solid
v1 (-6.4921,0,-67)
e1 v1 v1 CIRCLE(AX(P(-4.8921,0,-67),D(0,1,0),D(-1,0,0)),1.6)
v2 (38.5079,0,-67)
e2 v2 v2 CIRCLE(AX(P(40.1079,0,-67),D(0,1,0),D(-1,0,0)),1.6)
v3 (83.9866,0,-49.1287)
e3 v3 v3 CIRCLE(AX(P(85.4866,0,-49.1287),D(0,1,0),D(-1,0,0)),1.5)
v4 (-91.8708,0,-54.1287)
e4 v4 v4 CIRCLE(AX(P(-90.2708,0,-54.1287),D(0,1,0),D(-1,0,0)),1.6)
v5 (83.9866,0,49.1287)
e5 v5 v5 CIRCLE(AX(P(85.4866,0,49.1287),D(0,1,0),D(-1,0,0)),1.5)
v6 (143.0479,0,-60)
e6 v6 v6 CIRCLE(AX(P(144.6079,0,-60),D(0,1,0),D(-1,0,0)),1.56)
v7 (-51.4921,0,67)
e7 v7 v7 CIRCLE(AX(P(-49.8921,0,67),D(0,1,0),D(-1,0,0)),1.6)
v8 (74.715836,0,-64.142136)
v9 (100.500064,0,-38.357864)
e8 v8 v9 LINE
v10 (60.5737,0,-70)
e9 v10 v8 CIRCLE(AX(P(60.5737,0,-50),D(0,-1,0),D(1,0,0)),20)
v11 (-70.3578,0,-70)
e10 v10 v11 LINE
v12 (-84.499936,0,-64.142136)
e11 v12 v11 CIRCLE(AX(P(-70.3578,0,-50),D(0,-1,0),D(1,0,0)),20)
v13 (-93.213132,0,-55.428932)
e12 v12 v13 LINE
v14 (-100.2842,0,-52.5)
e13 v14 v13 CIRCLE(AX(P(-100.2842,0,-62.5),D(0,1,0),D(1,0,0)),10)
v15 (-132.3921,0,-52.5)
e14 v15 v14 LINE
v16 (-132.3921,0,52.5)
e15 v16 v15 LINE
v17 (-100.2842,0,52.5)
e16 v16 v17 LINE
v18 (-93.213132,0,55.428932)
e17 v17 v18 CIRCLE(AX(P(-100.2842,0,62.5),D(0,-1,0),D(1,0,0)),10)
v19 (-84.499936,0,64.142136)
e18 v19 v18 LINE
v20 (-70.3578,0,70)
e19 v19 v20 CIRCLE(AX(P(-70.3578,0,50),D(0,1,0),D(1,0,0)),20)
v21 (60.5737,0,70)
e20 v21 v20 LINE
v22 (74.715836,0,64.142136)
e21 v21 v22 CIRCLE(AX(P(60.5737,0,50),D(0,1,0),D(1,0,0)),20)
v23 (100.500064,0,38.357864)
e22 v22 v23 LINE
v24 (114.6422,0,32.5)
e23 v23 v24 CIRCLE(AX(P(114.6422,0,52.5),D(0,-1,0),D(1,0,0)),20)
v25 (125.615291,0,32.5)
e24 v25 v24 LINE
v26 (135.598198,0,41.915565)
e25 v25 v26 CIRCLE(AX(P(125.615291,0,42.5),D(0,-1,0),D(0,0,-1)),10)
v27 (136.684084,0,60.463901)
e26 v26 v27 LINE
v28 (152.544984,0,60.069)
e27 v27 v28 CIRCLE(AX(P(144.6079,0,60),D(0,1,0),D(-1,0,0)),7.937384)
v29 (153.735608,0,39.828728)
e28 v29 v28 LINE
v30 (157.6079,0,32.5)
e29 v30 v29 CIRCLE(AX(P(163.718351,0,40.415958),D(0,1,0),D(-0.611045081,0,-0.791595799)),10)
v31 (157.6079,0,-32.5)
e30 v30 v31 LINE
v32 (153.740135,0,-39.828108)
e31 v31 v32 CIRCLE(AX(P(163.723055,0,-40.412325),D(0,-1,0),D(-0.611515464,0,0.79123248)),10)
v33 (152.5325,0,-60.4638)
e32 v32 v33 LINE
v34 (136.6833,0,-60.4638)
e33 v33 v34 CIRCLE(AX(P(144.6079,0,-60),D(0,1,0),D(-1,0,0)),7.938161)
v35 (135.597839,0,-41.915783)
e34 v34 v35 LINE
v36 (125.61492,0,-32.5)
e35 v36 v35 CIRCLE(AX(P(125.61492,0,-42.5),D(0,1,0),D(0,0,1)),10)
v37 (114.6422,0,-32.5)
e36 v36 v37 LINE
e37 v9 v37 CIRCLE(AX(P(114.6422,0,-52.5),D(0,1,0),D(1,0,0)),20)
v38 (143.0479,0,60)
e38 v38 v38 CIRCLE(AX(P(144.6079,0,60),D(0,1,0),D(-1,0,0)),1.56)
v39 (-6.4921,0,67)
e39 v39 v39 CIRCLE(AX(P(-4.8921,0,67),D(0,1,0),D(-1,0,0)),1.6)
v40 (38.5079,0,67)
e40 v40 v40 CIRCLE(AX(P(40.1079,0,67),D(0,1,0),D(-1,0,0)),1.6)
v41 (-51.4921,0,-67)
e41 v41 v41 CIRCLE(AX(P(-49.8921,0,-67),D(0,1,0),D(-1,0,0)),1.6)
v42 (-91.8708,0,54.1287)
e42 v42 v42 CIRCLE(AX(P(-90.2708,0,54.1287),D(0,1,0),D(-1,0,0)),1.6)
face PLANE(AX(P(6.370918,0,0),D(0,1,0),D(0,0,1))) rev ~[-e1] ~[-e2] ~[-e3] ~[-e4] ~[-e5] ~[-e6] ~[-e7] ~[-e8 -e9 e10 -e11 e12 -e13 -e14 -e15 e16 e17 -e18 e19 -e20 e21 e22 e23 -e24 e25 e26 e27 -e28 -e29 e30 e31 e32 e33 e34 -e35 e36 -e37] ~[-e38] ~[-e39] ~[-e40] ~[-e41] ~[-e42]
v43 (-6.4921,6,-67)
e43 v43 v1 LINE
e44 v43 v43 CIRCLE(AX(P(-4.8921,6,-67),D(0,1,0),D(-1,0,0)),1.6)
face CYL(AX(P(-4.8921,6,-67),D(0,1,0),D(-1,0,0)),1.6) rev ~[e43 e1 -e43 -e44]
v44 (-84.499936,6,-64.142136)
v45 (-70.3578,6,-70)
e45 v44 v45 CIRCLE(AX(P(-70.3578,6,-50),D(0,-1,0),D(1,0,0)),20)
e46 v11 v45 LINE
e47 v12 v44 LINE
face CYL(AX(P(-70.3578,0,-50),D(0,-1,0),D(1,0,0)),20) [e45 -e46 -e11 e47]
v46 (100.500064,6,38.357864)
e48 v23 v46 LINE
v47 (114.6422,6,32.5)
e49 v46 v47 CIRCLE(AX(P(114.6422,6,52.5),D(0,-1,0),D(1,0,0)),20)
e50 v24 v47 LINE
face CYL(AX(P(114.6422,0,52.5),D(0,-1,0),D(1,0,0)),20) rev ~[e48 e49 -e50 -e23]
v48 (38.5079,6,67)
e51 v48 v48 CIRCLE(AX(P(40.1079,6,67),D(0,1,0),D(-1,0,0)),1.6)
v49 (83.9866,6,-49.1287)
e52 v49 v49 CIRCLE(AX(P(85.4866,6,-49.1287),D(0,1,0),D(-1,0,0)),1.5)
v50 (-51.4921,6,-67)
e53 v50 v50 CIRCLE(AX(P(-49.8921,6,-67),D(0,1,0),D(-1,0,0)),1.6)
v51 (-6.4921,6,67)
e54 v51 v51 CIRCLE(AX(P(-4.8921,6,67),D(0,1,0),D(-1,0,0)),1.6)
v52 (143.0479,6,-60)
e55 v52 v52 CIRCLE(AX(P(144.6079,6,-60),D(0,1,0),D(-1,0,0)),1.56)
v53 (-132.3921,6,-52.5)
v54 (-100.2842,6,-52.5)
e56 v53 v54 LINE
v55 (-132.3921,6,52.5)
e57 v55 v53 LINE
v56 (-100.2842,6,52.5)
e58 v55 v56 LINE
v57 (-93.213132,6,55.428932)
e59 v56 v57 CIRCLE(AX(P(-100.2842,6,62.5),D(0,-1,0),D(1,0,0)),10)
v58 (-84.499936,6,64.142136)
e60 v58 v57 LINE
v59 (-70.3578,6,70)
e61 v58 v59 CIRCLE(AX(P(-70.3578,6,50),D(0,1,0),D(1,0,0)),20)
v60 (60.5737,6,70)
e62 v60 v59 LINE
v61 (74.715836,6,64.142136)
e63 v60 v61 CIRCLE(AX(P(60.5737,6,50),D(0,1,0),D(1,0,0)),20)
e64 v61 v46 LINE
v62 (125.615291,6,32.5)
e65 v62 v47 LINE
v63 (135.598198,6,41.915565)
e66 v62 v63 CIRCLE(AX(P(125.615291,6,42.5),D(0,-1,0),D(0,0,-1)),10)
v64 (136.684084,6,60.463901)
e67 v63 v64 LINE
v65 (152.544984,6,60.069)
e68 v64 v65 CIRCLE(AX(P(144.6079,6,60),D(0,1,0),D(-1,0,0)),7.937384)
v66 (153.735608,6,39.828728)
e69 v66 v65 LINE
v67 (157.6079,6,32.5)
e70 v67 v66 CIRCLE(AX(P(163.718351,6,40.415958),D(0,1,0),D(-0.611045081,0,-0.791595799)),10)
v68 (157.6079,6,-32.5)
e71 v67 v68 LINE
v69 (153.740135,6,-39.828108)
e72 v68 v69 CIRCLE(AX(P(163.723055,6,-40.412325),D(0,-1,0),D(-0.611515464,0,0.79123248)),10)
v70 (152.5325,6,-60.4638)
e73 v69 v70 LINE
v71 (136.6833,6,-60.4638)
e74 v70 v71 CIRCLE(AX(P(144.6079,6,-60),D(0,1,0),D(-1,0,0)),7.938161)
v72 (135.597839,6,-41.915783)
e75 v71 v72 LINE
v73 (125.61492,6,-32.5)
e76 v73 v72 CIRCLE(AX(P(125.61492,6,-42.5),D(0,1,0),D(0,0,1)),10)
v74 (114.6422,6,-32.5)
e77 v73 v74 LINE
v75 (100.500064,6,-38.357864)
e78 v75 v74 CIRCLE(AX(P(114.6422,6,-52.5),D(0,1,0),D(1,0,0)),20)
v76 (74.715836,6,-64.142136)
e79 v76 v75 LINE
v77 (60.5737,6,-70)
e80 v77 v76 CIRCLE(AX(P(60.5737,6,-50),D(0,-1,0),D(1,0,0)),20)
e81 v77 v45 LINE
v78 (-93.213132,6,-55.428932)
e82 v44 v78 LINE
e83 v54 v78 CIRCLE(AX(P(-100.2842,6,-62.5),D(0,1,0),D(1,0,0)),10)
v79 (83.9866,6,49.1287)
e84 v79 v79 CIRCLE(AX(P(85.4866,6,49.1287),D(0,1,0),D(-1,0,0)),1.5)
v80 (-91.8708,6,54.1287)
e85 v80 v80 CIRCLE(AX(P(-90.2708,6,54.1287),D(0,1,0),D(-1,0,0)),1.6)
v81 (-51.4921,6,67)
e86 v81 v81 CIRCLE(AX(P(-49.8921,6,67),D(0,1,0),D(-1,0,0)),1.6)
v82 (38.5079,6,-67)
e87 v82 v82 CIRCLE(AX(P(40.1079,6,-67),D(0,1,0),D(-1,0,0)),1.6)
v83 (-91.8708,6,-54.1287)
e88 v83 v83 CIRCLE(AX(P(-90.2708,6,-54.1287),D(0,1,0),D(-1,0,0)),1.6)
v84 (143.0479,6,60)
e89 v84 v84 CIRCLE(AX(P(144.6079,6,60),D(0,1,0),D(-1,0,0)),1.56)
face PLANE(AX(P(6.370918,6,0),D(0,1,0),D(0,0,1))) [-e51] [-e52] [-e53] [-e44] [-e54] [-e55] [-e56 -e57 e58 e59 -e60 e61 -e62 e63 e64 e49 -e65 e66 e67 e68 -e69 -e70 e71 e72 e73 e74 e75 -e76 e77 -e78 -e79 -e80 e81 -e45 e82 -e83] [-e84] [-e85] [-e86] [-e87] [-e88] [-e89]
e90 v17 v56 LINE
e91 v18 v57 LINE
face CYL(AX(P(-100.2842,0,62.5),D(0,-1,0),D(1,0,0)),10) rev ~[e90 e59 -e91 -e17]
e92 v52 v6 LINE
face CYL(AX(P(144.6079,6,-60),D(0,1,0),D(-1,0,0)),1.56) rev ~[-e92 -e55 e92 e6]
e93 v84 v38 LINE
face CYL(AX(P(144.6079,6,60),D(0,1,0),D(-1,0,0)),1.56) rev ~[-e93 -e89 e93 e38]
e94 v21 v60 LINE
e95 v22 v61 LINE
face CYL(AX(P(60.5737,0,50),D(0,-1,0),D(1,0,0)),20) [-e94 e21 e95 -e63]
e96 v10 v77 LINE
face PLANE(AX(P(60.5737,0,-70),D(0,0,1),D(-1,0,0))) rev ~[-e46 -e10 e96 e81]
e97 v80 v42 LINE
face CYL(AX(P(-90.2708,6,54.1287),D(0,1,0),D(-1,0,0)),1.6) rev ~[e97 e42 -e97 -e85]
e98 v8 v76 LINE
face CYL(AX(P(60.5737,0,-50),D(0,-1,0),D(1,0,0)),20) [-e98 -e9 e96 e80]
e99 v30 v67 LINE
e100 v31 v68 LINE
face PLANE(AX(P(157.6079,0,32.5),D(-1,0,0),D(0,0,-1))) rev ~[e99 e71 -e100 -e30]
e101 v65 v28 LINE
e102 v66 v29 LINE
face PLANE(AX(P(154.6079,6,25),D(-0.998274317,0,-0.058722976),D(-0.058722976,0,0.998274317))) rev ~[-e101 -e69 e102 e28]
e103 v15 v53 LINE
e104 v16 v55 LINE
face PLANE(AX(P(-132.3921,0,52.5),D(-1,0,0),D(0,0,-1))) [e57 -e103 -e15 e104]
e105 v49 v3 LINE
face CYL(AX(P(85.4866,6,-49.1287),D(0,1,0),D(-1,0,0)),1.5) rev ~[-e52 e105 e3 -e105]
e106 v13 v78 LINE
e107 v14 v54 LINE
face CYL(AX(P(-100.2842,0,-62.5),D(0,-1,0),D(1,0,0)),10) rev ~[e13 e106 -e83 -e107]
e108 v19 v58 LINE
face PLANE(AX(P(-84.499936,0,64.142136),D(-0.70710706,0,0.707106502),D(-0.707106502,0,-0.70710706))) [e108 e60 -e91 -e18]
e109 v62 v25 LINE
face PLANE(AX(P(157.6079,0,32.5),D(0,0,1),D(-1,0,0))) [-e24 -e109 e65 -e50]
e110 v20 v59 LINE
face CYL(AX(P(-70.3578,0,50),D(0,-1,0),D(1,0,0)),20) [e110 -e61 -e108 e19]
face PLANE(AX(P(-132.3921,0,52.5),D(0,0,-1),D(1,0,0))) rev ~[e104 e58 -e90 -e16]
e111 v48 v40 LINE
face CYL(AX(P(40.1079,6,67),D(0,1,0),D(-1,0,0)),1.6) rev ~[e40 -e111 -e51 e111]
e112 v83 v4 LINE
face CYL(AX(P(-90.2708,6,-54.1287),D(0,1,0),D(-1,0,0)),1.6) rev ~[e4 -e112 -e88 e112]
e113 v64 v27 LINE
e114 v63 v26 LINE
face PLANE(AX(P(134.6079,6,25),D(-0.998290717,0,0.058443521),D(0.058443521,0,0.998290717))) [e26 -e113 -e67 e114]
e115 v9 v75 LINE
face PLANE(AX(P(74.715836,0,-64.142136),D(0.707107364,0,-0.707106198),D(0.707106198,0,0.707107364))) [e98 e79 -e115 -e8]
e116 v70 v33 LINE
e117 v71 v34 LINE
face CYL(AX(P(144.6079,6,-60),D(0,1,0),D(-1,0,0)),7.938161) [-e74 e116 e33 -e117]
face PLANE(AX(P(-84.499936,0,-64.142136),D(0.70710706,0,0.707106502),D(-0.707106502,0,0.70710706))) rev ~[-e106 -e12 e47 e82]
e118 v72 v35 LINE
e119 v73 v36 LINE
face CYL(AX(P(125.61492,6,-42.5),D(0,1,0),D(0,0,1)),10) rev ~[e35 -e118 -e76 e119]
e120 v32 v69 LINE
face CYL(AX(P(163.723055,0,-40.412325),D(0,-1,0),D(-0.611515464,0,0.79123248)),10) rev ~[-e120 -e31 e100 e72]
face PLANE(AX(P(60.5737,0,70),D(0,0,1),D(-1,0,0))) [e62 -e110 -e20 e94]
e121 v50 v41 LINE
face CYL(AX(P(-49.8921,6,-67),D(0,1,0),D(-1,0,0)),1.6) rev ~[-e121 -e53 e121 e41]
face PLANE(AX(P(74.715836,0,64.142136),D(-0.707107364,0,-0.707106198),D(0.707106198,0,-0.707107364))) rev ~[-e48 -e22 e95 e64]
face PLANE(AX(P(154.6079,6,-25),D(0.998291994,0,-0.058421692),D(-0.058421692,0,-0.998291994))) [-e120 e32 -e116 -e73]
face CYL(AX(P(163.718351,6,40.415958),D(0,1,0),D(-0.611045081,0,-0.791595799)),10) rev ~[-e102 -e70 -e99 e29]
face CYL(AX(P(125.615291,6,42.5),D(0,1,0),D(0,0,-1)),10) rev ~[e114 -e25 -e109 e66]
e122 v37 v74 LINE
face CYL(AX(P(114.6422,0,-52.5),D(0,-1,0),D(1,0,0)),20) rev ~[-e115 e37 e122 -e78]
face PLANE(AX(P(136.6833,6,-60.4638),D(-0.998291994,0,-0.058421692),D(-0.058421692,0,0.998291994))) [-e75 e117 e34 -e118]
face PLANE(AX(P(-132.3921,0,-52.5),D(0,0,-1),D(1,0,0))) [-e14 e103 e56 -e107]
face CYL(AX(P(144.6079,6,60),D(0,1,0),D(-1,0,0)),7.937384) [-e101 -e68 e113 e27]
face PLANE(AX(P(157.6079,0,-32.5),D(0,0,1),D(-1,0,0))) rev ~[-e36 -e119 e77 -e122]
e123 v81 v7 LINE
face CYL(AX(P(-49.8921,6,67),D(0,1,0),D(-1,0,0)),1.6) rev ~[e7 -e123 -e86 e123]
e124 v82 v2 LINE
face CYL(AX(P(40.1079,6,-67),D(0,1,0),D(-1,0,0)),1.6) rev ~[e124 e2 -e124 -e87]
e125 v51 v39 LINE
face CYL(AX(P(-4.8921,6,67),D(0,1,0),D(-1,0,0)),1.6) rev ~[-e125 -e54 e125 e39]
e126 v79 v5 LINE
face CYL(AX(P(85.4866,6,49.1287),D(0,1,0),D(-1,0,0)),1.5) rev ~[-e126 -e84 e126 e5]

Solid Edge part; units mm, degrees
sketch "Sketch1" plane through (0, 0, 0) normal (0, -1, 0) x (1, 0, 0)
  line L0 (74.7158, 64.1421) -> (100.5001, 38.3579)
  arc A0 (100.5001, 38.3579) -> (114.6422, 32.5) centre (114.6422, 52.5) ccw
  line L1 (157.6079, 32.5) -> (114.6422, 32.5)
  line L2 (157.6079, 32.5) -> (157.6079, -32.5)
  line L3 (157.6079, -32.5) -> (114.6422, -32.5)
  arc A1 (100.5001, -38.3579) -> (114.6422, -32.5) centre (114.6422, -52.5) cw
  line L4 (74.7158, -64.1421) -> (100.5001, -38.3579)
  arc A2 (60.5737, -70) -> (74.7158, -64.1421) centre (60.5737, -50) ccw
  line L5 (60.5737, -70) -> (-70.3578, -70)
  arc A3 (-84.4999, -64.1421) -> (-70.3578, -70) centre (-70.3578, -50) ccw
  line L6 (-84.4999, -64.1421) -> (-93.2131, -55.4289)
  arc A4 (-100.2842, -52.5) -> (-93.2131, -55.4289) centre (-100.2842, -62.5) cw
  line L7 (-132.3921, -52.5) -> (-100.2842, -52.5)
  line L8 (-132.3921, 52.5) -> (-132.3921, -52.5)
  line L9 (-132.3921, 52.5) -> (-100.2842, 52.5)
  arc A5 (-100.2842, 52.5) -> (-93.2131, 55.4289) centre (-100.2842, 62.5) ccw
  line L10 (-84.4999, 64.1421) -> (-93.2131, 55.4289)
  arc A6 (-84.4999, 64.1421) -> (-70.3578, 70) centre (-70.3578, 50) cw
  line L11 (60.5737, 70) -> (-70.3578, 70)
  arc A7 (60.5737, 70) -> (74.7158, 64.1421) centre (60.5737, 50) cw
extrude "Protrusion1" add sketch "Sketch1" against normal blind 6
sketch "Sketch2" plane through (-2.3921, 6, 0) normal (0, 1, 0) x (-1, 0, 0)
  circle A0 centre (-87.8787, 49.1287) radius 1.5
  circle A1 centre (2.5, 67) radius 1.6
  circle A2 centre (-42.5, 67) radius 1.6
  circle A3 centre (47.5, 67) radius 1.6
  circle A4 centre (87.8787, 54.1287) radius 1.6
  circle A5 centre (-87.8787, -49.1287) radius 1.5
  circle A6 centre (2.5, -67) radius 1.6
  circle A7 centre (-42.5, -67) radius 1.6
  circle A8 centre (47.5, -67) radius 1.6
  circle A9 centre (87.8787, -54.1287) radius 1.6
extrude "ExtrudedCutout_2" cut sketch "Sketch2" along normal mid plane 140
sketch "Sketch3" plane through (-2.3921, 6, 0) normal (0, 1, 0) x (-1, 0, 0)
  circle A0 centre (-147, 60) radius 1.56
  line L0 (-157, -25) -> (-154.9246, -60.4638)
  line L1 (-139.0754, -60.4638) -> (-137, -25)
  line L2 (-157, -25) -> (-137, -25)
  arc A1 (-154.9246, -60.4638) -> (-139.0754, -60.4638) centre (-147, -60) ccw
  circle A2 centre (-147, -60) radius 1.56
  line L3 (-137, 25) -> (-139.0762, 60.4639)
  line L4 (-157, 25) -> (-154.9371, 60.069)
  line L5 (-157, 25) -> (-137, 25)
  arc A3 (-139.0762, 60.4639) -> (-154.9371, 60.069) centre (-147, 60) ccw
extrude "ExtrudedProtrusion_4" add sketch "Sketch3" against normal blind 6
fillet "Round_3" radius 10 4 edges at (154.169, 3, -32.5) (135.0468, 3, -32.5) (154.1667, 3, 32.5) (135.047, 3, 32.5)
